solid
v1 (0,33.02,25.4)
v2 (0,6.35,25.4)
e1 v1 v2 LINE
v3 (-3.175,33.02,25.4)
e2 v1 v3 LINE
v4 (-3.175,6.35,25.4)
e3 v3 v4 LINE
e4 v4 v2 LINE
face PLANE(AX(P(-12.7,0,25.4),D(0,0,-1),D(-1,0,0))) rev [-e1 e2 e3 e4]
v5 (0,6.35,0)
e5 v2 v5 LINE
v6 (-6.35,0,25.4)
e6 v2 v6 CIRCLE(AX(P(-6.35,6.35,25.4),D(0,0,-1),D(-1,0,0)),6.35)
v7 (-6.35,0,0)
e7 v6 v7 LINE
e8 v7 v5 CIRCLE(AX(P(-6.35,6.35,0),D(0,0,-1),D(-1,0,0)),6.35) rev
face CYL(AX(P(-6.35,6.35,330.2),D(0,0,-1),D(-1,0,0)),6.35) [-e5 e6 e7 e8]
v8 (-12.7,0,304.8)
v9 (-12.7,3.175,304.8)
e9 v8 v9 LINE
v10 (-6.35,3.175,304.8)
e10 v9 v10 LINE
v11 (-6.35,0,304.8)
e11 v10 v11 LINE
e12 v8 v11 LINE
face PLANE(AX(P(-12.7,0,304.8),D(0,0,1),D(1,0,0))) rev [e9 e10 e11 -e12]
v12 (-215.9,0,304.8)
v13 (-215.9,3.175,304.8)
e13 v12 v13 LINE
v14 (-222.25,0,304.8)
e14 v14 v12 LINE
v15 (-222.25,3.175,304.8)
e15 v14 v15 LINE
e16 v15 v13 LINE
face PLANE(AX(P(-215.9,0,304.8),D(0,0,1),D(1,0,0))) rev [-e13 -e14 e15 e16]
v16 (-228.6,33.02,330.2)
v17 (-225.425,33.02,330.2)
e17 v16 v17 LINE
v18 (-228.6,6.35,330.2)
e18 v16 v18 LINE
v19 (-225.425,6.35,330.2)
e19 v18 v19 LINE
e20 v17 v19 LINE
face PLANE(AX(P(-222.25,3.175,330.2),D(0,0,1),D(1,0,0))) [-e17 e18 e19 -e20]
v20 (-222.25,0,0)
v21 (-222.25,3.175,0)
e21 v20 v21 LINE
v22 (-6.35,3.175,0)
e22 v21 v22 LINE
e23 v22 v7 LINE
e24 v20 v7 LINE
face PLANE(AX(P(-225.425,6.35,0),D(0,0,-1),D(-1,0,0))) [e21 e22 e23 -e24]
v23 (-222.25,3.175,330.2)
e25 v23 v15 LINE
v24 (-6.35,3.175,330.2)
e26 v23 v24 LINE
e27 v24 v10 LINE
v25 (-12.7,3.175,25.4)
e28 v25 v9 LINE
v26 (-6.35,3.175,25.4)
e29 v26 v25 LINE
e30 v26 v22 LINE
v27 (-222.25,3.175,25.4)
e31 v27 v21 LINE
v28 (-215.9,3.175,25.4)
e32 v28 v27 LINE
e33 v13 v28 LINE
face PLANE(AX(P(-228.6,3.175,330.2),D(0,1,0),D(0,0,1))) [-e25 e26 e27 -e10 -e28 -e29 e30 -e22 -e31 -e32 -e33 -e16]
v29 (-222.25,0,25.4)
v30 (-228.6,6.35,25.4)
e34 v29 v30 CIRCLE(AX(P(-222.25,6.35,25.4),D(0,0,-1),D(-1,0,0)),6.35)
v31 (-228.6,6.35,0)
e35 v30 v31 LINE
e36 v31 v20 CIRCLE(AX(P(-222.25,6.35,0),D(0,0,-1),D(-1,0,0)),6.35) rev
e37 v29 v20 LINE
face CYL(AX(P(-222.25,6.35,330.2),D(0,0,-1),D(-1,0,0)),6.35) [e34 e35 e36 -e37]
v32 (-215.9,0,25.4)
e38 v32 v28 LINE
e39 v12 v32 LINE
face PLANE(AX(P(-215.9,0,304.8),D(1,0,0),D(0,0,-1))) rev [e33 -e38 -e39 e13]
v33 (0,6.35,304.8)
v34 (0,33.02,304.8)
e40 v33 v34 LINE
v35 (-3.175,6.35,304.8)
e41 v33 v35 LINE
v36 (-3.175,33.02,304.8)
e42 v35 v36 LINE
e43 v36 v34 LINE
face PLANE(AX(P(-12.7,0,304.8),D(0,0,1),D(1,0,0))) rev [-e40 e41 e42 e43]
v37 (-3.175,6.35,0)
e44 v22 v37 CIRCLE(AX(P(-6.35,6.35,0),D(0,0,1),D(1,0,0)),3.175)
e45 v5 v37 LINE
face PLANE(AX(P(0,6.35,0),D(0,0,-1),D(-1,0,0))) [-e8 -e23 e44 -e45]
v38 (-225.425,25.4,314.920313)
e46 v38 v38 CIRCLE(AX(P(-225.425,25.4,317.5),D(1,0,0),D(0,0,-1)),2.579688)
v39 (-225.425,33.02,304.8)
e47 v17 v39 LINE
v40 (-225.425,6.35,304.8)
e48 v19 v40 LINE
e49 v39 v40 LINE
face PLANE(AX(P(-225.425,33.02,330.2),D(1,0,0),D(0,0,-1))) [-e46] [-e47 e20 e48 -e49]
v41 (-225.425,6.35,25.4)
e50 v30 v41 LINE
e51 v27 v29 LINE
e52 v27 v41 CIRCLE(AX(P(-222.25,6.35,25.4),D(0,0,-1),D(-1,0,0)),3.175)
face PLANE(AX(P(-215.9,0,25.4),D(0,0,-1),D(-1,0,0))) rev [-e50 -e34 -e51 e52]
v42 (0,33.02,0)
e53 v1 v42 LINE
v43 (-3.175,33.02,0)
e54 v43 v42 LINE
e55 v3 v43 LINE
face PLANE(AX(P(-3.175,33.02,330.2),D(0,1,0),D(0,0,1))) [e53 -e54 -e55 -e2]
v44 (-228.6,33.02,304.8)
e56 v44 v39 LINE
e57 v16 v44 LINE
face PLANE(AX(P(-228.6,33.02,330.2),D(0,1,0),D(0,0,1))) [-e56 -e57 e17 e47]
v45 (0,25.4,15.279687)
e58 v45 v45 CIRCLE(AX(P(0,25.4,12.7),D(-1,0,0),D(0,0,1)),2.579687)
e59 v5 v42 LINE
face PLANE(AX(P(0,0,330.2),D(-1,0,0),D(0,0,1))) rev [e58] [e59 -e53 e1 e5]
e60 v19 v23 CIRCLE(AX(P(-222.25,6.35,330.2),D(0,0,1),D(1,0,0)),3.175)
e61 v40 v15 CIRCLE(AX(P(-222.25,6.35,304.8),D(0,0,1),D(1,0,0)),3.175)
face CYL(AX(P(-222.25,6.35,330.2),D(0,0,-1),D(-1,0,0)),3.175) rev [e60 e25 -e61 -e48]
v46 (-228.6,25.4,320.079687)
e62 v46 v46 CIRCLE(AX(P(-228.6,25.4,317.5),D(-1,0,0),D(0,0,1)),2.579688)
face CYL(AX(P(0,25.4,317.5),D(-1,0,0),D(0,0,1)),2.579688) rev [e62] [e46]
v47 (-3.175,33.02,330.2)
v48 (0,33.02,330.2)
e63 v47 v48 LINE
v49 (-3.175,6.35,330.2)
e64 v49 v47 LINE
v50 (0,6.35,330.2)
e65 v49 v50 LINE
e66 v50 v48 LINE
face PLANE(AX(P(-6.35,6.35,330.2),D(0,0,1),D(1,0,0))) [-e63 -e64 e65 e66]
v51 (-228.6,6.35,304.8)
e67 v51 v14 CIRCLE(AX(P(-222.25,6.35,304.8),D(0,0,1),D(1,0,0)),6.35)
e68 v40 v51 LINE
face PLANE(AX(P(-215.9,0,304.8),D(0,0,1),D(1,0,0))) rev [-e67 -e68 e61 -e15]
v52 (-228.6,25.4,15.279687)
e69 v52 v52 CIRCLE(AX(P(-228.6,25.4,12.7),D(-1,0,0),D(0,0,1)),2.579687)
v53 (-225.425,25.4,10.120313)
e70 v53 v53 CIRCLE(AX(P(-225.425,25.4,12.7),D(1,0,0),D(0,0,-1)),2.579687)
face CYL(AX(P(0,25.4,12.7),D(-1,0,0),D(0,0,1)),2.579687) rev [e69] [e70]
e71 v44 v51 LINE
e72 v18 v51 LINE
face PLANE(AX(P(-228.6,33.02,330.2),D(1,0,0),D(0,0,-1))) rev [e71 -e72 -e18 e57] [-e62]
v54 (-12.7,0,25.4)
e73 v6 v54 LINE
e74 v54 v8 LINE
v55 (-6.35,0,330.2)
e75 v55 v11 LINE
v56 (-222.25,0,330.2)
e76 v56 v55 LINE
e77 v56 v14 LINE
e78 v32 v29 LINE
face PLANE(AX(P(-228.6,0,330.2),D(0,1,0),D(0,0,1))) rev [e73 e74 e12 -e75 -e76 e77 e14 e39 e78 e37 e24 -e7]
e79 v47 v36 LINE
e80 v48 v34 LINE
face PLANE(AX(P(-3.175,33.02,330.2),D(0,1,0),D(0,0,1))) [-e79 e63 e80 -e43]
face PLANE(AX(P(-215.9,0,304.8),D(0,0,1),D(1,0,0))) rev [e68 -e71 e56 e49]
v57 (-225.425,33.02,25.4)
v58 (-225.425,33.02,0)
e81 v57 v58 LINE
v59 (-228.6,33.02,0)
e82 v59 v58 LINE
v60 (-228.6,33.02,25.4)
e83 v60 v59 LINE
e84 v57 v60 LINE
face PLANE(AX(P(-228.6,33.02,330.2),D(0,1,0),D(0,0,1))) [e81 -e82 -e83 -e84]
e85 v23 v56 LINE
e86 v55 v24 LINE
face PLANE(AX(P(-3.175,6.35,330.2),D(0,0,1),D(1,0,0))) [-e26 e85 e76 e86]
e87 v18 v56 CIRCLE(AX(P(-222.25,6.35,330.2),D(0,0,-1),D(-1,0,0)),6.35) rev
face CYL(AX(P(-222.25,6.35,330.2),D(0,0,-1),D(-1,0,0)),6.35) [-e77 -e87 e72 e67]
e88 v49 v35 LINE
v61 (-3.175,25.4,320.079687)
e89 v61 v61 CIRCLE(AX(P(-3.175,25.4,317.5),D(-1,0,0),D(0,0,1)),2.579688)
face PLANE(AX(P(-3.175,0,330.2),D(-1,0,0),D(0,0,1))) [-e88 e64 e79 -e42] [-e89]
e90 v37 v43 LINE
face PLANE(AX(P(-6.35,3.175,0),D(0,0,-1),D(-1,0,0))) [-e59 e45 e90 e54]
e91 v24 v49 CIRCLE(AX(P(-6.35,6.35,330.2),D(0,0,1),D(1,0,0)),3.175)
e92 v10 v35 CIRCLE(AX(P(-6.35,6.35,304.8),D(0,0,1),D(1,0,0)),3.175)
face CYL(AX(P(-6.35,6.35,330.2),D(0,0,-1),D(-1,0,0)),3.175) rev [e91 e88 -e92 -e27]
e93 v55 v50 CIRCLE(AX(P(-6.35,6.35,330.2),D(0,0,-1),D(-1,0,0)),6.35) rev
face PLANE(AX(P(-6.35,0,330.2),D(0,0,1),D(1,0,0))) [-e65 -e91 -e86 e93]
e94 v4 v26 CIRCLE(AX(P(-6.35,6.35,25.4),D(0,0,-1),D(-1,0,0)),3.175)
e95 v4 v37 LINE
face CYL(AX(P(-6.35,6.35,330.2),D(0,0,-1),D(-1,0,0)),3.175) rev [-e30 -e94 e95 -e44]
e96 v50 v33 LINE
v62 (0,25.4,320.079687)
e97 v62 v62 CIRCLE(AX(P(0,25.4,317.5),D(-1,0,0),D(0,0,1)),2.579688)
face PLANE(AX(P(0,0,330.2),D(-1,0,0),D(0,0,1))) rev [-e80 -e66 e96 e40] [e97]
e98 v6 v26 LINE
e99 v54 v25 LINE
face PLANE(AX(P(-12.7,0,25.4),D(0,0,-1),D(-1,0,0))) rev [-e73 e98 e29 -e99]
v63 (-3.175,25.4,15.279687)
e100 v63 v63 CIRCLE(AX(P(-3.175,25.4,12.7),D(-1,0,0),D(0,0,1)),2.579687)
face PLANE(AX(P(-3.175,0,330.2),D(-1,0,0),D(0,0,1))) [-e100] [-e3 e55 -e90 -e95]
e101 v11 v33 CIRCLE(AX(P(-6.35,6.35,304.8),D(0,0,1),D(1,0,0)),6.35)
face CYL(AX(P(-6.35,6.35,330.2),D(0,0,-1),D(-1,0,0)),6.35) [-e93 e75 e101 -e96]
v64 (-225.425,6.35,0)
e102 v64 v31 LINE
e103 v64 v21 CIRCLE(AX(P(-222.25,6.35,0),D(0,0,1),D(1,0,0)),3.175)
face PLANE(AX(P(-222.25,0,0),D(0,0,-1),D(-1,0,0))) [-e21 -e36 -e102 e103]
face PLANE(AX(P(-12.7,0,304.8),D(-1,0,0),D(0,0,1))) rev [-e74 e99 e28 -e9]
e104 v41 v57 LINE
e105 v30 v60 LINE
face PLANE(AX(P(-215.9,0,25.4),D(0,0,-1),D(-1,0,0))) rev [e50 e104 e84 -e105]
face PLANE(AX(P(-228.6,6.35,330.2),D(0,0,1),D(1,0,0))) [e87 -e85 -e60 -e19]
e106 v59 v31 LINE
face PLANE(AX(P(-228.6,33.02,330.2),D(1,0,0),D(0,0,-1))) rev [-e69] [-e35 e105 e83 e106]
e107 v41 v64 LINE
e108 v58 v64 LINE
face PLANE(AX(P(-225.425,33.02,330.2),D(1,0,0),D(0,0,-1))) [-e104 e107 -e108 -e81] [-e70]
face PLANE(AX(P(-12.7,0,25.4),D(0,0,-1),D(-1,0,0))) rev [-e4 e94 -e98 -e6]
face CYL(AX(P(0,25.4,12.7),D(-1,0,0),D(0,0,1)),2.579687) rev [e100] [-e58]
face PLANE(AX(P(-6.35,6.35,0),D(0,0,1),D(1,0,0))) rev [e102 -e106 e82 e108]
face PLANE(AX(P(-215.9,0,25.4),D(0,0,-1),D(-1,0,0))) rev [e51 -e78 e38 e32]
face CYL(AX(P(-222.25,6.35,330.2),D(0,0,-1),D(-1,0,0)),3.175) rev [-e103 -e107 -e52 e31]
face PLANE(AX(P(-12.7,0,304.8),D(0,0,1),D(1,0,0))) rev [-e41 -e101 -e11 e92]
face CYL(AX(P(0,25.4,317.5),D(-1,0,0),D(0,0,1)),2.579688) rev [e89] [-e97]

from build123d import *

# Parameters (mm, degrees)
BASE_FLANGE1_DEPTH      = 330.2
SKETCH21_R              = 2.5796875
CUT_EXTRUDE1_DEPTH      = 403.964415799
CUT_EXTRUDE2_DEPTH      = 403.716679596
CUT_EXTRUDE2_DEPTH_BACK = 403.716679596
SKETCH22_W              = 50.8
SKETCH22_H              = 279.4


# Sheet-metal steps are written as plain solids
with BuildPart() as part:
    # Sketch7 → Base-Flange1 (new body)
    with BuildSketch(Plane.XY):
        with BuildLine():
            Line((-228.6, 33.02), (-228.6, 6.35))
            ThreePointArc((-228.6, 6.35), (-226.740128061, 1.859871939), (-222.25, 0))
            Line((-222.25, 0), (-6.35, 0))
            ThreePointArc((-6.35, 0), (-1.859871939, 1.859871939), (0, 6.35))
            Line((0, 6.35), (0, 33.02))
            Line((0, 33.02), (-3.175, 33.02))
            Line((-3.175, 33.02), (-3.175, 6.35))
            ThreePointArc((-3.175, 6.35), (-4.10493597, 4.10493597), (-6.35, 3.175))
            Line((-6.35, 3.175), (-222.25, 3.175))
            ThreePointArc((-222.25, 3.175), (-224.49506403, 4.10493597), (-225.425, 6.35))
            Line((-225.425, 6.35), (-225.425, 33.02))
            Line((-225.425, 33.02), (-228.6, 33.02))
        make_face()
    extrude(amount=BASE_FLANGE1_DEPTH)

    # Sketch21 → Cut-Extrude1 (cut, through all)
    with BuildSketch(Plane.ZY.offset(228.6)):
        with Locations((12.7, 25.4)):
            Circle(SKETCH21_R)
        with Locations((317.5, 25.4)):
            Circle(SKETCH21_R)
    extrude(amount=-CUT_EXTRUDE1_DEPTH, mode=Mode.SUBTRACT)

    # Sketch22 → Cut-Extrude2 (cut, two sides: drawn at the far end of the back side and taken through both)
    with BuildSketch(Plane(origin=(0, 3.175, 0), x_dir=(1, 0, 0), z_dir=(0, 1, 0)).offset(-CUT_EXTRUDE2_DEPTH_BACK)):
        with Locations((-241.3, -165.1)):
            Rectangle(SKETCH22_W, SKETCH22_H)
        with Locations((12.7, -165.1)):
            Rectangle(SKETCH22_W, SKETCH22_H)
    extrude(amount=CUT_EXTRUDE2_DEPTH + CUT_EXTRUDE2_DEPTH_BACK, mode=Mode.SUBTRACT)


solid = part.part
